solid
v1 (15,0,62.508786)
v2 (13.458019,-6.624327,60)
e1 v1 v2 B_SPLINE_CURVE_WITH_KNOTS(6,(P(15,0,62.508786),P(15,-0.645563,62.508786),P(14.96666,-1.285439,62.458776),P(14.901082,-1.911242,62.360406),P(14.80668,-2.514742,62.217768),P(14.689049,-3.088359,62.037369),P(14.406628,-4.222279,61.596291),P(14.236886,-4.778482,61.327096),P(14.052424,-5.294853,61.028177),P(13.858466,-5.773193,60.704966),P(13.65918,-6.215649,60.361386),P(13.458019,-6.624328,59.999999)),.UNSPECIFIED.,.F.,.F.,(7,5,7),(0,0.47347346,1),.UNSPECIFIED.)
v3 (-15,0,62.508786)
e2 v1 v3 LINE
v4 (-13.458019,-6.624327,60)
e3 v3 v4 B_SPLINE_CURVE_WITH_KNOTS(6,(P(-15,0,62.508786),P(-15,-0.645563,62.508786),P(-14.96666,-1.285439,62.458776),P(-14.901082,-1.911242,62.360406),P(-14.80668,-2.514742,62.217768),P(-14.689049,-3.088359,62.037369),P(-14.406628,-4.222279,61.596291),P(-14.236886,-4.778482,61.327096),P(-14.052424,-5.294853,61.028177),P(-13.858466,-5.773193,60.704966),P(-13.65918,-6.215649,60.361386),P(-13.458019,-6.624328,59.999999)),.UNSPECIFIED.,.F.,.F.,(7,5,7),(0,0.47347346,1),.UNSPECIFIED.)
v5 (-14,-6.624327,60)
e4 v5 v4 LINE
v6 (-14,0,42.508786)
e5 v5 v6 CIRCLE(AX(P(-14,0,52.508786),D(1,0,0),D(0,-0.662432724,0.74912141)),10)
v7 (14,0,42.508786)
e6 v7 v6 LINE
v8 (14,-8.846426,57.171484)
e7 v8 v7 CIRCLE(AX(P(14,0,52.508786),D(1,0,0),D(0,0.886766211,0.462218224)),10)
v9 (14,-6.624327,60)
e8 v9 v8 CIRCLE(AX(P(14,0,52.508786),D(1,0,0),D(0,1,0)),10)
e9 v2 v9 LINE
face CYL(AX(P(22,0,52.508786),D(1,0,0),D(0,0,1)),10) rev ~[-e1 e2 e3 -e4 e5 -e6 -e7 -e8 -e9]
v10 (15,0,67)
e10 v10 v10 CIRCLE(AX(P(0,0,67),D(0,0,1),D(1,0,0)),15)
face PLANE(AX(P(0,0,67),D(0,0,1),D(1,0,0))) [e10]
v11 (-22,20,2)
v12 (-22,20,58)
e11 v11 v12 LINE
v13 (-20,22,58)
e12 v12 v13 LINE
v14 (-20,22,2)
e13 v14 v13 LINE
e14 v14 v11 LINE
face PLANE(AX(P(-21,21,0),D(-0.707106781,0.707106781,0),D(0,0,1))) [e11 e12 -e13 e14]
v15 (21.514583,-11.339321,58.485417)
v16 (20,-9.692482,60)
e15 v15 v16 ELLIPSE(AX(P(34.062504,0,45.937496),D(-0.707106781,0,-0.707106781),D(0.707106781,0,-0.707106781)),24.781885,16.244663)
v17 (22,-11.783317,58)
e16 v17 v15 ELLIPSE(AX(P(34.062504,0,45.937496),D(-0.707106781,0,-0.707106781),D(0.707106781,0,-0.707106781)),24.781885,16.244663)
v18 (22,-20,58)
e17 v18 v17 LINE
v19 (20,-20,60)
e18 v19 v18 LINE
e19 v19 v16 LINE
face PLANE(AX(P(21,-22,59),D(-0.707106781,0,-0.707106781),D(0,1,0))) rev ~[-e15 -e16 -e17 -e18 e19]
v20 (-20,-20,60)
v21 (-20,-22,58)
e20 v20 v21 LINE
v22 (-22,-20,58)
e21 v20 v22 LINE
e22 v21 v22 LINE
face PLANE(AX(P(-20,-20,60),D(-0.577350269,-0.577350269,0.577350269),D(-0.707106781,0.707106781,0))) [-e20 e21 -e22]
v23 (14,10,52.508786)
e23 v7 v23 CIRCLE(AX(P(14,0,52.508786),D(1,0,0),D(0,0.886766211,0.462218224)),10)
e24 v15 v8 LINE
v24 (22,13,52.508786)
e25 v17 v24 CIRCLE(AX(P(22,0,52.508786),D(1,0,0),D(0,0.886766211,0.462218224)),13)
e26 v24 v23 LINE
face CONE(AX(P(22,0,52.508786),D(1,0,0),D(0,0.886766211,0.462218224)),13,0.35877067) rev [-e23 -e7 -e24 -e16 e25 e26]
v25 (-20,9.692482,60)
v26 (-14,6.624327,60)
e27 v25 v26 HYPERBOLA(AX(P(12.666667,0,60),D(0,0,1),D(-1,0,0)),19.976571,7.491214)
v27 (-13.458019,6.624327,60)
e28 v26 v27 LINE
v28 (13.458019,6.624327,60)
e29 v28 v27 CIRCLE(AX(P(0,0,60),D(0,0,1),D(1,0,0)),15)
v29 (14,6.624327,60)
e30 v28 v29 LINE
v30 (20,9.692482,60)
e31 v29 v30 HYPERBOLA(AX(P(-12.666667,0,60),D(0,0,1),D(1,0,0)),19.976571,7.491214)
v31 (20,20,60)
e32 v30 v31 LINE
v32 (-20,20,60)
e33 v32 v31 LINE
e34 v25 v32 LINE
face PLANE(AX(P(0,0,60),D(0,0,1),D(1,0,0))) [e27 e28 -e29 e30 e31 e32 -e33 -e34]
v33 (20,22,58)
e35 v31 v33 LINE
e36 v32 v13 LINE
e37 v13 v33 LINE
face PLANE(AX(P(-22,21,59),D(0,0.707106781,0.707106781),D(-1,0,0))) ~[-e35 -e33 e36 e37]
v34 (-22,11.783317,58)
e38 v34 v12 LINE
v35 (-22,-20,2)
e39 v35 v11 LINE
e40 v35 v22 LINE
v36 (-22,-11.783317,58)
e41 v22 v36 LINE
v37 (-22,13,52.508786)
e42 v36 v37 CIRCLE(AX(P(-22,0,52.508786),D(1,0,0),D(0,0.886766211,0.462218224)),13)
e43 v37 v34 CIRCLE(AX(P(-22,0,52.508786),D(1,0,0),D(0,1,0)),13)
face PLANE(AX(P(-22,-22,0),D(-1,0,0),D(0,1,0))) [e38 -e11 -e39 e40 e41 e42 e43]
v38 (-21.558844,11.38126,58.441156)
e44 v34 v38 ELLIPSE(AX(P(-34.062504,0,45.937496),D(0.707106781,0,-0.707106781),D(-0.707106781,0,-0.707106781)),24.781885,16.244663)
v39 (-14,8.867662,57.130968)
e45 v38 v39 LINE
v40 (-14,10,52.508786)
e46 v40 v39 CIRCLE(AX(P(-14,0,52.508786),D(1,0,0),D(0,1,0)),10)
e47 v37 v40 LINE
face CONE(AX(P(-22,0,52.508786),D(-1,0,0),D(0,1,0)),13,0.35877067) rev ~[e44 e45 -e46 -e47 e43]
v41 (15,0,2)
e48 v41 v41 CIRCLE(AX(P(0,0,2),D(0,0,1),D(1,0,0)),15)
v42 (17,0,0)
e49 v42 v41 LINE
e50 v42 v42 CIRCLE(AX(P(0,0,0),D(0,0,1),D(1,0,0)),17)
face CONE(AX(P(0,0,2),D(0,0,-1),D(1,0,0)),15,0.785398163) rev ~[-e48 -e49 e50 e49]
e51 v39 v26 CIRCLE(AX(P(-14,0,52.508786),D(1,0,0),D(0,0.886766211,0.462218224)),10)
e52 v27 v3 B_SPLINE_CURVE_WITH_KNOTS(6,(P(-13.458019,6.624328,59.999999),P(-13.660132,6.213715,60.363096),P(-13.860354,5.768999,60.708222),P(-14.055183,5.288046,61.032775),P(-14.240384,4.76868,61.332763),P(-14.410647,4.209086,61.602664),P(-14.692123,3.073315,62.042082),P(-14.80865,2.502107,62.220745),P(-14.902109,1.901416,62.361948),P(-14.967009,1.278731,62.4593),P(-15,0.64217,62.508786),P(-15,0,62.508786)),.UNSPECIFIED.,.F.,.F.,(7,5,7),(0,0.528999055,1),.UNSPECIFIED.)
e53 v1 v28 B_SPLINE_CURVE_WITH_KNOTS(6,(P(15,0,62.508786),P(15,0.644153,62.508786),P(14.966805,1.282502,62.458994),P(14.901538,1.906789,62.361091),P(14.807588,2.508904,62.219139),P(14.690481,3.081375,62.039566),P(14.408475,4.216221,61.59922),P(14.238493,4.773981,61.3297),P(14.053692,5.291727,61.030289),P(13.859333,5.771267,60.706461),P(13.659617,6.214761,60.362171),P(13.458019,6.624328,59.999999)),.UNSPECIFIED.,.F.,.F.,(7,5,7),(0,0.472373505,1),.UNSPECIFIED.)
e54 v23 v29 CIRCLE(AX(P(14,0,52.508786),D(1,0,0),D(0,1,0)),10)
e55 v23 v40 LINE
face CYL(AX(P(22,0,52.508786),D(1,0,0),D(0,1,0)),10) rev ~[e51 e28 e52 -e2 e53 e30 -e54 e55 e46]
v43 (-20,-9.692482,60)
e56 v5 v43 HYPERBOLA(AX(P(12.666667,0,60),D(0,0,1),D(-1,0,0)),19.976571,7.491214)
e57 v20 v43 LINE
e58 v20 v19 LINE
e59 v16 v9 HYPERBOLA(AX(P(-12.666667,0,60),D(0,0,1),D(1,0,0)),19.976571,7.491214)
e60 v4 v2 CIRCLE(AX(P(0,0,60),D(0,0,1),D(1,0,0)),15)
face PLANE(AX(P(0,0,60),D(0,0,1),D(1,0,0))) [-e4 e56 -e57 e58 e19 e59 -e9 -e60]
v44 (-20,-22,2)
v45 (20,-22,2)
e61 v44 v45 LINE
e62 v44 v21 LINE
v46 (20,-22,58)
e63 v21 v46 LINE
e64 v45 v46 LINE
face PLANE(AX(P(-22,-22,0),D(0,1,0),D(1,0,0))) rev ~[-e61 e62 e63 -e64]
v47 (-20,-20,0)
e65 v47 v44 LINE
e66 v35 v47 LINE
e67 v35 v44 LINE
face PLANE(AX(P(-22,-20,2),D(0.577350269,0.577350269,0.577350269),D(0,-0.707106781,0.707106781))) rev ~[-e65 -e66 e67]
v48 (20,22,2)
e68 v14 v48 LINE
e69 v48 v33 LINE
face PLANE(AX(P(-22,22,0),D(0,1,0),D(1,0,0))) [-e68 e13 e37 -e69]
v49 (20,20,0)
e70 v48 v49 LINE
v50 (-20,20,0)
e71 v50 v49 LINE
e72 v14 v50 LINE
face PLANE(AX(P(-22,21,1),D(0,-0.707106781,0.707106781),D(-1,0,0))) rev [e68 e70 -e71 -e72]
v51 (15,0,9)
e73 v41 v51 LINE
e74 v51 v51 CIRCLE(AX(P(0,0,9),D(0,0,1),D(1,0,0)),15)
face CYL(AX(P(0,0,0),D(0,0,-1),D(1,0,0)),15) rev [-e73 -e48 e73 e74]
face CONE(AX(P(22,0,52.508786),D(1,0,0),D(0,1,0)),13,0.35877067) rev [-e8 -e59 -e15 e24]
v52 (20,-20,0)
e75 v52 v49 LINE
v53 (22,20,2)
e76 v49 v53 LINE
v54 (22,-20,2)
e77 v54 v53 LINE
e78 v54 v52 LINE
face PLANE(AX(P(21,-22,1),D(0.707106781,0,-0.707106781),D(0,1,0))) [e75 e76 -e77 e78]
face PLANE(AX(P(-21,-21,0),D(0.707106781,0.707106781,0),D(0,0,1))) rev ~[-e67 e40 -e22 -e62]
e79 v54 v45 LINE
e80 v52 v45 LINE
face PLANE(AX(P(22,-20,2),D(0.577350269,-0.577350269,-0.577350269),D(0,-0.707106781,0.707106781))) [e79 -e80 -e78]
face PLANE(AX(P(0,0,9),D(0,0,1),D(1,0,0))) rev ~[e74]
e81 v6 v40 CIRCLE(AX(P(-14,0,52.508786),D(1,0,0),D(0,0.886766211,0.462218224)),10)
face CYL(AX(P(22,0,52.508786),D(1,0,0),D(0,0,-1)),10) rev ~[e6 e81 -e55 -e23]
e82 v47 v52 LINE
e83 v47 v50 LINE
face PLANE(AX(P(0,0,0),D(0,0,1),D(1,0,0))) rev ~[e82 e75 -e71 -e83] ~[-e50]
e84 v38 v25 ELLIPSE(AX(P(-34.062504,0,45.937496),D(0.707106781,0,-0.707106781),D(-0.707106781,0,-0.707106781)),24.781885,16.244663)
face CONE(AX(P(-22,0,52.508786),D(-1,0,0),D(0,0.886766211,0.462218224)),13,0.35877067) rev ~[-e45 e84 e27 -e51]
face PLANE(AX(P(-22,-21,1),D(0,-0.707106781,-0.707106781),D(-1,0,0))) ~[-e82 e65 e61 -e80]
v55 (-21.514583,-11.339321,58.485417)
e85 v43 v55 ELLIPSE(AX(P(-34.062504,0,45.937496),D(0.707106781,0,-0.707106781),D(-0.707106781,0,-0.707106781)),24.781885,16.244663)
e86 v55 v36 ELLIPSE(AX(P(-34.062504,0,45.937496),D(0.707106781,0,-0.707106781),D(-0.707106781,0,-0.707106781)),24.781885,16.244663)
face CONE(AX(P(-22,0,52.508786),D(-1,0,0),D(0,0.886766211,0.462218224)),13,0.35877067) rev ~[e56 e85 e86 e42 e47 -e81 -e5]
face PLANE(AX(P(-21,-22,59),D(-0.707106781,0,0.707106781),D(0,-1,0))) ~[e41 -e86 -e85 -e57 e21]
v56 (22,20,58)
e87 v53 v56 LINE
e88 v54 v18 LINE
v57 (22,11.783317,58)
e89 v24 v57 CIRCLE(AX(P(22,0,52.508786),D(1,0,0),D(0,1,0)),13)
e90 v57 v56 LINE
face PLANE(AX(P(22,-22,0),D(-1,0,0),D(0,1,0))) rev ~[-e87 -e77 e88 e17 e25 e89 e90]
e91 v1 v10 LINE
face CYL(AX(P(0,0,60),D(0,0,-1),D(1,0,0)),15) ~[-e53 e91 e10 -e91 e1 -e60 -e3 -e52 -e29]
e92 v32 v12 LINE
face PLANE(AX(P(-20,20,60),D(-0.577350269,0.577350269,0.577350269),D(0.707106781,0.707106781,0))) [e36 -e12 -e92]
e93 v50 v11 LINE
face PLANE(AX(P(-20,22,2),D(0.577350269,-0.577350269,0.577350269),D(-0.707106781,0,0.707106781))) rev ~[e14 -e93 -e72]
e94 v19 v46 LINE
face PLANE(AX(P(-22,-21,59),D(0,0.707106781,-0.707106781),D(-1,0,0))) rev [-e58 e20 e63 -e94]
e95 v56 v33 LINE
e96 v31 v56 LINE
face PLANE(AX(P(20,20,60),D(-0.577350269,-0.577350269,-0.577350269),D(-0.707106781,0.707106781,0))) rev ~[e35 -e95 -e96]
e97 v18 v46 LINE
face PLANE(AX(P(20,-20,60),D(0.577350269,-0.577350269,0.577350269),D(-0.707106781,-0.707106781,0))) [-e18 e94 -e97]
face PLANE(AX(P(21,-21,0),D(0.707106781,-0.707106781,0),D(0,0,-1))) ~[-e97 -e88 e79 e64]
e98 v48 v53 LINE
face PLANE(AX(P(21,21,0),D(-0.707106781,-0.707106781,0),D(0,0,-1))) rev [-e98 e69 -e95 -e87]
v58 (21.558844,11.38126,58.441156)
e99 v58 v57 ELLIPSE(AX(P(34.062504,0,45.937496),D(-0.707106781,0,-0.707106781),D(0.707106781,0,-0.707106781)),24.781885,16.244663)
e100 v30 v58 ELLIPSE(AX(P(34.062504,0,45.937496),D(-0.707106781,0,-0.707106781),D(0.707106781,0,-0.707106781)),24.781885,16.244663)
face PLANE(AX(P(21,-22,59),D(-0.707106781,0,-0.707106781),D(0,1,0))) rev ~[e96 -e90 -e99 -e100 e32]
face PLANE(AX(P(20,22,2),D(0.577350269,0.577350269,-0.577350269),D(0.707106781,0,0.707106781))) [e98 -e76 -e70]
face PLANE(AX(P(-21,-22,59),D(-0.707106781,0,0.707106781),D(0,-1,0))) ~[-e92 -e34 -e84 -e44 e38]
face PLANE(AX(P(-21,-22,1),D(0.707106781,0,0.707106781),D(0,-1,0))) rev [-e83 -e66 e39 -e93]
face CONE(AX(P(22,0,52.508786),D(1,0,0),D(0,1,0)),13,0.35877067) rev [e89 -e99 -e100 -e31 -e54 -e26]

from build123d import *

# Parameters (mm, degrees)
F2_W          = 44
F2_H          = 44
F2_R          = 15
F2_R_2        = 10
F3_DEPTH      = 60
F4_R          = 15
F4_R_2        = 10
F5_DEPTH      = 7
F6_DEPTH      = 9
F8_SIZE       = 2
F11_DEPTH     = 60
F12_T4_ANGLE  = 332.4696617
F12_T9_ANGLE  = 152.2075678766
F12_T14_ANGLE = 152.2075678766
F12_T19_ANGLE = 332.4696617


# Not quite as in the source:
# - a fillet or chamfer that OpenCascade refuses, or shapes differently, is made with other operations: its cross-section is extruded or revolved along the edge and cut away or added


with BuildPart() as f3:
    # F2 (on Top) → F3 (new body)
    with BuildSketch(Plane.XY):
        Rectangle(F2_W, F2_H)
        Circle(F2_R, mode=Mode.SUBTRACT)
        Circle(F2_R)
        Circle(F2_R_2, mode=Mode.SUBTRACT)
        Circle(F2_R_2)
    extrude(amount=F3_DEPTH)

    # F4 (on face) → F5 (join)
    with BuildSketch(Plane.XY.offset(60)):
        Circle(F4_R)
        Circle(F4_R_2, mode=Mode.SUBTRACT)
        Circle(F4_R_2)
    extrude(amount=F5_DEPTH)

    # F2 (on Top) → F6 (cut)
    with BuildSketch(Plane.XY):
        Circle(F2_R)
        Circle(F2_R_2, mode=Mode.SUBTRACT)
        Circle(F2_R_2)
    extrude(amount=F6_DEPTH, mode=Mode.SUBTRACT)

    # F8
    f8_edges = [f3.edges().sort_by_distance(p)[0] for p in [
        (0, -22, 0),
        (22, 0, 0),
        (-22, 0, 0),
        (0, 22, 0),
        (-22, -22, 30),
        (-22, 22, 30),
        (22, 22, 30),
        (22, -22, 30),
        (22, 0, 60),
        (0, -22, 60),
        (-22, 0, 60),
        (0, 22, 60),
        (-15, 0, 0),
    ]]
    chamfer(f8_edges, length=F8_SIZE)

    # F10 (on offset) → F11 (cut)
    with BuildSketch(Plane.YZ.offset(22)):
        with BuildLine():
            ThreePointArc((10, 52.5087859035), (7.0710678119, 59.5798537153), (0, 62.5087859035))
            Line((0, 62.5087859035), (0, 42.5087859035))
            ThreePointArc((0, 42.5087859035), (7.0710678119, 45.4377180916), (10, 52.5087859035))
        make_face()
        with BuildLine():
            Line((0, 42.5087859035), (0, 62.5087859035))
            ThreePointArc((0, 62.5087859035), (-10, 52.5087859035), (0, 42.5087859035))
        make_face()
    extrude(amount=-F11_DEPTH, mode=Mode.SUBTRACT)

    # F12: chamfer of 3 x 8 on 4 edges, made by hand


with BuildPart() as f12_tool2:
    # F12_s3 → F12_t4 (revolve)
    with BuildSketch(Plane(origin=(0, -21.5222750688, 41.2905103072), x_dir=(1, 0, 0), z_dir=(0, 0.4622182236, -0.8867662115))):
        Polygon((-22, -37.2705177426), (-14, -34.2705177426), (-22, -34.2705177426), align=None)
    revolve(axis=Axis((-22, 0, 52.5087859035), (1, 0, 0)), revolution_arc=F12_T4_ANGLE)

    split(bisect_by=Plane.XY.offset(60), keep=Keep.BOTTOM)


with BuildPart() as f3_1:
    add(f3.part)

    # F12_t1: cut F12_tool2
    add(f12_tool2.part, mode=Mode.SUBTRACT)


with BuildPart() as f12_tool7:
    # F12_s8 → F12_t9 (revolve)
    with BuildSketch(Plane.XY.offset(52.5087859035)):
        Polygon((-22, 13), (-14, 10), (-22, 10), align=None)
    revolve(axis=Axis((-22, 0, 52.5087859035), (1, 0, 0)), revolution_arc=F12_T9_ANGLE)

    split(bisect_by=Plane.XY.offset(60), keep=Keep.BOTTOM)


with BuildPart() as f3_2:
    add(f3_1.part)

    # F12_t6: cut F12_tool7
    add(f12_tool7.part, mode=Mode.SUBTRACT)


with BuildPart() as f12_tool12:
    # F12_s13 → F12_t14 (revolve)
    with BuildSketch(Plane.XY.offset(52.5087859035)):
        Polygon((22, 13), (14, 10), (22, 10), align=None)
    revolve(axis=Axis((22, 0, 52.5087859035), (1, 0, 0)), revolution_arc=F12_T14_ANGLE)

    split(bisect_by=Plane.XY.offset(60), keep=Keep.BOTTOM)


with BuildPart() as f3_3:
    add(f3_2.part)

    # F12_t11: cut F12_tool12
    add(f12_tool12.part, mode=Mode.SUBTRACT)


with BuildPart() as f12_tool17:
    # F12_s18 → F12_t19 (revolve)
    with BuildSketch(Plane(origin=(0, -21.5222750688, 41.2905103072), x_dir=(1, 0, 0), z_dir=(0, 0.4622182236, -0.8867662115))):
        Polygon((22, -37.2705177426), (14, -34.2705177426), (22, -34.2705177426), align=None)
    revolve(axis=Axis((22, 0, 52.5087859035), (1, 0, 0)), revolution_arc=F12_T19_ANGLE)

    split(bisect_by=Plane.XY.offset(60), keep=Keep.BOTTOM)


with BuildPart() as f3_4:
    add(f3_3.part)

    # F12_t16: cut F12_tool17
    add(f12_tool17.part, mode=Mode.SUBTRACT)


solid = f3_4.part
